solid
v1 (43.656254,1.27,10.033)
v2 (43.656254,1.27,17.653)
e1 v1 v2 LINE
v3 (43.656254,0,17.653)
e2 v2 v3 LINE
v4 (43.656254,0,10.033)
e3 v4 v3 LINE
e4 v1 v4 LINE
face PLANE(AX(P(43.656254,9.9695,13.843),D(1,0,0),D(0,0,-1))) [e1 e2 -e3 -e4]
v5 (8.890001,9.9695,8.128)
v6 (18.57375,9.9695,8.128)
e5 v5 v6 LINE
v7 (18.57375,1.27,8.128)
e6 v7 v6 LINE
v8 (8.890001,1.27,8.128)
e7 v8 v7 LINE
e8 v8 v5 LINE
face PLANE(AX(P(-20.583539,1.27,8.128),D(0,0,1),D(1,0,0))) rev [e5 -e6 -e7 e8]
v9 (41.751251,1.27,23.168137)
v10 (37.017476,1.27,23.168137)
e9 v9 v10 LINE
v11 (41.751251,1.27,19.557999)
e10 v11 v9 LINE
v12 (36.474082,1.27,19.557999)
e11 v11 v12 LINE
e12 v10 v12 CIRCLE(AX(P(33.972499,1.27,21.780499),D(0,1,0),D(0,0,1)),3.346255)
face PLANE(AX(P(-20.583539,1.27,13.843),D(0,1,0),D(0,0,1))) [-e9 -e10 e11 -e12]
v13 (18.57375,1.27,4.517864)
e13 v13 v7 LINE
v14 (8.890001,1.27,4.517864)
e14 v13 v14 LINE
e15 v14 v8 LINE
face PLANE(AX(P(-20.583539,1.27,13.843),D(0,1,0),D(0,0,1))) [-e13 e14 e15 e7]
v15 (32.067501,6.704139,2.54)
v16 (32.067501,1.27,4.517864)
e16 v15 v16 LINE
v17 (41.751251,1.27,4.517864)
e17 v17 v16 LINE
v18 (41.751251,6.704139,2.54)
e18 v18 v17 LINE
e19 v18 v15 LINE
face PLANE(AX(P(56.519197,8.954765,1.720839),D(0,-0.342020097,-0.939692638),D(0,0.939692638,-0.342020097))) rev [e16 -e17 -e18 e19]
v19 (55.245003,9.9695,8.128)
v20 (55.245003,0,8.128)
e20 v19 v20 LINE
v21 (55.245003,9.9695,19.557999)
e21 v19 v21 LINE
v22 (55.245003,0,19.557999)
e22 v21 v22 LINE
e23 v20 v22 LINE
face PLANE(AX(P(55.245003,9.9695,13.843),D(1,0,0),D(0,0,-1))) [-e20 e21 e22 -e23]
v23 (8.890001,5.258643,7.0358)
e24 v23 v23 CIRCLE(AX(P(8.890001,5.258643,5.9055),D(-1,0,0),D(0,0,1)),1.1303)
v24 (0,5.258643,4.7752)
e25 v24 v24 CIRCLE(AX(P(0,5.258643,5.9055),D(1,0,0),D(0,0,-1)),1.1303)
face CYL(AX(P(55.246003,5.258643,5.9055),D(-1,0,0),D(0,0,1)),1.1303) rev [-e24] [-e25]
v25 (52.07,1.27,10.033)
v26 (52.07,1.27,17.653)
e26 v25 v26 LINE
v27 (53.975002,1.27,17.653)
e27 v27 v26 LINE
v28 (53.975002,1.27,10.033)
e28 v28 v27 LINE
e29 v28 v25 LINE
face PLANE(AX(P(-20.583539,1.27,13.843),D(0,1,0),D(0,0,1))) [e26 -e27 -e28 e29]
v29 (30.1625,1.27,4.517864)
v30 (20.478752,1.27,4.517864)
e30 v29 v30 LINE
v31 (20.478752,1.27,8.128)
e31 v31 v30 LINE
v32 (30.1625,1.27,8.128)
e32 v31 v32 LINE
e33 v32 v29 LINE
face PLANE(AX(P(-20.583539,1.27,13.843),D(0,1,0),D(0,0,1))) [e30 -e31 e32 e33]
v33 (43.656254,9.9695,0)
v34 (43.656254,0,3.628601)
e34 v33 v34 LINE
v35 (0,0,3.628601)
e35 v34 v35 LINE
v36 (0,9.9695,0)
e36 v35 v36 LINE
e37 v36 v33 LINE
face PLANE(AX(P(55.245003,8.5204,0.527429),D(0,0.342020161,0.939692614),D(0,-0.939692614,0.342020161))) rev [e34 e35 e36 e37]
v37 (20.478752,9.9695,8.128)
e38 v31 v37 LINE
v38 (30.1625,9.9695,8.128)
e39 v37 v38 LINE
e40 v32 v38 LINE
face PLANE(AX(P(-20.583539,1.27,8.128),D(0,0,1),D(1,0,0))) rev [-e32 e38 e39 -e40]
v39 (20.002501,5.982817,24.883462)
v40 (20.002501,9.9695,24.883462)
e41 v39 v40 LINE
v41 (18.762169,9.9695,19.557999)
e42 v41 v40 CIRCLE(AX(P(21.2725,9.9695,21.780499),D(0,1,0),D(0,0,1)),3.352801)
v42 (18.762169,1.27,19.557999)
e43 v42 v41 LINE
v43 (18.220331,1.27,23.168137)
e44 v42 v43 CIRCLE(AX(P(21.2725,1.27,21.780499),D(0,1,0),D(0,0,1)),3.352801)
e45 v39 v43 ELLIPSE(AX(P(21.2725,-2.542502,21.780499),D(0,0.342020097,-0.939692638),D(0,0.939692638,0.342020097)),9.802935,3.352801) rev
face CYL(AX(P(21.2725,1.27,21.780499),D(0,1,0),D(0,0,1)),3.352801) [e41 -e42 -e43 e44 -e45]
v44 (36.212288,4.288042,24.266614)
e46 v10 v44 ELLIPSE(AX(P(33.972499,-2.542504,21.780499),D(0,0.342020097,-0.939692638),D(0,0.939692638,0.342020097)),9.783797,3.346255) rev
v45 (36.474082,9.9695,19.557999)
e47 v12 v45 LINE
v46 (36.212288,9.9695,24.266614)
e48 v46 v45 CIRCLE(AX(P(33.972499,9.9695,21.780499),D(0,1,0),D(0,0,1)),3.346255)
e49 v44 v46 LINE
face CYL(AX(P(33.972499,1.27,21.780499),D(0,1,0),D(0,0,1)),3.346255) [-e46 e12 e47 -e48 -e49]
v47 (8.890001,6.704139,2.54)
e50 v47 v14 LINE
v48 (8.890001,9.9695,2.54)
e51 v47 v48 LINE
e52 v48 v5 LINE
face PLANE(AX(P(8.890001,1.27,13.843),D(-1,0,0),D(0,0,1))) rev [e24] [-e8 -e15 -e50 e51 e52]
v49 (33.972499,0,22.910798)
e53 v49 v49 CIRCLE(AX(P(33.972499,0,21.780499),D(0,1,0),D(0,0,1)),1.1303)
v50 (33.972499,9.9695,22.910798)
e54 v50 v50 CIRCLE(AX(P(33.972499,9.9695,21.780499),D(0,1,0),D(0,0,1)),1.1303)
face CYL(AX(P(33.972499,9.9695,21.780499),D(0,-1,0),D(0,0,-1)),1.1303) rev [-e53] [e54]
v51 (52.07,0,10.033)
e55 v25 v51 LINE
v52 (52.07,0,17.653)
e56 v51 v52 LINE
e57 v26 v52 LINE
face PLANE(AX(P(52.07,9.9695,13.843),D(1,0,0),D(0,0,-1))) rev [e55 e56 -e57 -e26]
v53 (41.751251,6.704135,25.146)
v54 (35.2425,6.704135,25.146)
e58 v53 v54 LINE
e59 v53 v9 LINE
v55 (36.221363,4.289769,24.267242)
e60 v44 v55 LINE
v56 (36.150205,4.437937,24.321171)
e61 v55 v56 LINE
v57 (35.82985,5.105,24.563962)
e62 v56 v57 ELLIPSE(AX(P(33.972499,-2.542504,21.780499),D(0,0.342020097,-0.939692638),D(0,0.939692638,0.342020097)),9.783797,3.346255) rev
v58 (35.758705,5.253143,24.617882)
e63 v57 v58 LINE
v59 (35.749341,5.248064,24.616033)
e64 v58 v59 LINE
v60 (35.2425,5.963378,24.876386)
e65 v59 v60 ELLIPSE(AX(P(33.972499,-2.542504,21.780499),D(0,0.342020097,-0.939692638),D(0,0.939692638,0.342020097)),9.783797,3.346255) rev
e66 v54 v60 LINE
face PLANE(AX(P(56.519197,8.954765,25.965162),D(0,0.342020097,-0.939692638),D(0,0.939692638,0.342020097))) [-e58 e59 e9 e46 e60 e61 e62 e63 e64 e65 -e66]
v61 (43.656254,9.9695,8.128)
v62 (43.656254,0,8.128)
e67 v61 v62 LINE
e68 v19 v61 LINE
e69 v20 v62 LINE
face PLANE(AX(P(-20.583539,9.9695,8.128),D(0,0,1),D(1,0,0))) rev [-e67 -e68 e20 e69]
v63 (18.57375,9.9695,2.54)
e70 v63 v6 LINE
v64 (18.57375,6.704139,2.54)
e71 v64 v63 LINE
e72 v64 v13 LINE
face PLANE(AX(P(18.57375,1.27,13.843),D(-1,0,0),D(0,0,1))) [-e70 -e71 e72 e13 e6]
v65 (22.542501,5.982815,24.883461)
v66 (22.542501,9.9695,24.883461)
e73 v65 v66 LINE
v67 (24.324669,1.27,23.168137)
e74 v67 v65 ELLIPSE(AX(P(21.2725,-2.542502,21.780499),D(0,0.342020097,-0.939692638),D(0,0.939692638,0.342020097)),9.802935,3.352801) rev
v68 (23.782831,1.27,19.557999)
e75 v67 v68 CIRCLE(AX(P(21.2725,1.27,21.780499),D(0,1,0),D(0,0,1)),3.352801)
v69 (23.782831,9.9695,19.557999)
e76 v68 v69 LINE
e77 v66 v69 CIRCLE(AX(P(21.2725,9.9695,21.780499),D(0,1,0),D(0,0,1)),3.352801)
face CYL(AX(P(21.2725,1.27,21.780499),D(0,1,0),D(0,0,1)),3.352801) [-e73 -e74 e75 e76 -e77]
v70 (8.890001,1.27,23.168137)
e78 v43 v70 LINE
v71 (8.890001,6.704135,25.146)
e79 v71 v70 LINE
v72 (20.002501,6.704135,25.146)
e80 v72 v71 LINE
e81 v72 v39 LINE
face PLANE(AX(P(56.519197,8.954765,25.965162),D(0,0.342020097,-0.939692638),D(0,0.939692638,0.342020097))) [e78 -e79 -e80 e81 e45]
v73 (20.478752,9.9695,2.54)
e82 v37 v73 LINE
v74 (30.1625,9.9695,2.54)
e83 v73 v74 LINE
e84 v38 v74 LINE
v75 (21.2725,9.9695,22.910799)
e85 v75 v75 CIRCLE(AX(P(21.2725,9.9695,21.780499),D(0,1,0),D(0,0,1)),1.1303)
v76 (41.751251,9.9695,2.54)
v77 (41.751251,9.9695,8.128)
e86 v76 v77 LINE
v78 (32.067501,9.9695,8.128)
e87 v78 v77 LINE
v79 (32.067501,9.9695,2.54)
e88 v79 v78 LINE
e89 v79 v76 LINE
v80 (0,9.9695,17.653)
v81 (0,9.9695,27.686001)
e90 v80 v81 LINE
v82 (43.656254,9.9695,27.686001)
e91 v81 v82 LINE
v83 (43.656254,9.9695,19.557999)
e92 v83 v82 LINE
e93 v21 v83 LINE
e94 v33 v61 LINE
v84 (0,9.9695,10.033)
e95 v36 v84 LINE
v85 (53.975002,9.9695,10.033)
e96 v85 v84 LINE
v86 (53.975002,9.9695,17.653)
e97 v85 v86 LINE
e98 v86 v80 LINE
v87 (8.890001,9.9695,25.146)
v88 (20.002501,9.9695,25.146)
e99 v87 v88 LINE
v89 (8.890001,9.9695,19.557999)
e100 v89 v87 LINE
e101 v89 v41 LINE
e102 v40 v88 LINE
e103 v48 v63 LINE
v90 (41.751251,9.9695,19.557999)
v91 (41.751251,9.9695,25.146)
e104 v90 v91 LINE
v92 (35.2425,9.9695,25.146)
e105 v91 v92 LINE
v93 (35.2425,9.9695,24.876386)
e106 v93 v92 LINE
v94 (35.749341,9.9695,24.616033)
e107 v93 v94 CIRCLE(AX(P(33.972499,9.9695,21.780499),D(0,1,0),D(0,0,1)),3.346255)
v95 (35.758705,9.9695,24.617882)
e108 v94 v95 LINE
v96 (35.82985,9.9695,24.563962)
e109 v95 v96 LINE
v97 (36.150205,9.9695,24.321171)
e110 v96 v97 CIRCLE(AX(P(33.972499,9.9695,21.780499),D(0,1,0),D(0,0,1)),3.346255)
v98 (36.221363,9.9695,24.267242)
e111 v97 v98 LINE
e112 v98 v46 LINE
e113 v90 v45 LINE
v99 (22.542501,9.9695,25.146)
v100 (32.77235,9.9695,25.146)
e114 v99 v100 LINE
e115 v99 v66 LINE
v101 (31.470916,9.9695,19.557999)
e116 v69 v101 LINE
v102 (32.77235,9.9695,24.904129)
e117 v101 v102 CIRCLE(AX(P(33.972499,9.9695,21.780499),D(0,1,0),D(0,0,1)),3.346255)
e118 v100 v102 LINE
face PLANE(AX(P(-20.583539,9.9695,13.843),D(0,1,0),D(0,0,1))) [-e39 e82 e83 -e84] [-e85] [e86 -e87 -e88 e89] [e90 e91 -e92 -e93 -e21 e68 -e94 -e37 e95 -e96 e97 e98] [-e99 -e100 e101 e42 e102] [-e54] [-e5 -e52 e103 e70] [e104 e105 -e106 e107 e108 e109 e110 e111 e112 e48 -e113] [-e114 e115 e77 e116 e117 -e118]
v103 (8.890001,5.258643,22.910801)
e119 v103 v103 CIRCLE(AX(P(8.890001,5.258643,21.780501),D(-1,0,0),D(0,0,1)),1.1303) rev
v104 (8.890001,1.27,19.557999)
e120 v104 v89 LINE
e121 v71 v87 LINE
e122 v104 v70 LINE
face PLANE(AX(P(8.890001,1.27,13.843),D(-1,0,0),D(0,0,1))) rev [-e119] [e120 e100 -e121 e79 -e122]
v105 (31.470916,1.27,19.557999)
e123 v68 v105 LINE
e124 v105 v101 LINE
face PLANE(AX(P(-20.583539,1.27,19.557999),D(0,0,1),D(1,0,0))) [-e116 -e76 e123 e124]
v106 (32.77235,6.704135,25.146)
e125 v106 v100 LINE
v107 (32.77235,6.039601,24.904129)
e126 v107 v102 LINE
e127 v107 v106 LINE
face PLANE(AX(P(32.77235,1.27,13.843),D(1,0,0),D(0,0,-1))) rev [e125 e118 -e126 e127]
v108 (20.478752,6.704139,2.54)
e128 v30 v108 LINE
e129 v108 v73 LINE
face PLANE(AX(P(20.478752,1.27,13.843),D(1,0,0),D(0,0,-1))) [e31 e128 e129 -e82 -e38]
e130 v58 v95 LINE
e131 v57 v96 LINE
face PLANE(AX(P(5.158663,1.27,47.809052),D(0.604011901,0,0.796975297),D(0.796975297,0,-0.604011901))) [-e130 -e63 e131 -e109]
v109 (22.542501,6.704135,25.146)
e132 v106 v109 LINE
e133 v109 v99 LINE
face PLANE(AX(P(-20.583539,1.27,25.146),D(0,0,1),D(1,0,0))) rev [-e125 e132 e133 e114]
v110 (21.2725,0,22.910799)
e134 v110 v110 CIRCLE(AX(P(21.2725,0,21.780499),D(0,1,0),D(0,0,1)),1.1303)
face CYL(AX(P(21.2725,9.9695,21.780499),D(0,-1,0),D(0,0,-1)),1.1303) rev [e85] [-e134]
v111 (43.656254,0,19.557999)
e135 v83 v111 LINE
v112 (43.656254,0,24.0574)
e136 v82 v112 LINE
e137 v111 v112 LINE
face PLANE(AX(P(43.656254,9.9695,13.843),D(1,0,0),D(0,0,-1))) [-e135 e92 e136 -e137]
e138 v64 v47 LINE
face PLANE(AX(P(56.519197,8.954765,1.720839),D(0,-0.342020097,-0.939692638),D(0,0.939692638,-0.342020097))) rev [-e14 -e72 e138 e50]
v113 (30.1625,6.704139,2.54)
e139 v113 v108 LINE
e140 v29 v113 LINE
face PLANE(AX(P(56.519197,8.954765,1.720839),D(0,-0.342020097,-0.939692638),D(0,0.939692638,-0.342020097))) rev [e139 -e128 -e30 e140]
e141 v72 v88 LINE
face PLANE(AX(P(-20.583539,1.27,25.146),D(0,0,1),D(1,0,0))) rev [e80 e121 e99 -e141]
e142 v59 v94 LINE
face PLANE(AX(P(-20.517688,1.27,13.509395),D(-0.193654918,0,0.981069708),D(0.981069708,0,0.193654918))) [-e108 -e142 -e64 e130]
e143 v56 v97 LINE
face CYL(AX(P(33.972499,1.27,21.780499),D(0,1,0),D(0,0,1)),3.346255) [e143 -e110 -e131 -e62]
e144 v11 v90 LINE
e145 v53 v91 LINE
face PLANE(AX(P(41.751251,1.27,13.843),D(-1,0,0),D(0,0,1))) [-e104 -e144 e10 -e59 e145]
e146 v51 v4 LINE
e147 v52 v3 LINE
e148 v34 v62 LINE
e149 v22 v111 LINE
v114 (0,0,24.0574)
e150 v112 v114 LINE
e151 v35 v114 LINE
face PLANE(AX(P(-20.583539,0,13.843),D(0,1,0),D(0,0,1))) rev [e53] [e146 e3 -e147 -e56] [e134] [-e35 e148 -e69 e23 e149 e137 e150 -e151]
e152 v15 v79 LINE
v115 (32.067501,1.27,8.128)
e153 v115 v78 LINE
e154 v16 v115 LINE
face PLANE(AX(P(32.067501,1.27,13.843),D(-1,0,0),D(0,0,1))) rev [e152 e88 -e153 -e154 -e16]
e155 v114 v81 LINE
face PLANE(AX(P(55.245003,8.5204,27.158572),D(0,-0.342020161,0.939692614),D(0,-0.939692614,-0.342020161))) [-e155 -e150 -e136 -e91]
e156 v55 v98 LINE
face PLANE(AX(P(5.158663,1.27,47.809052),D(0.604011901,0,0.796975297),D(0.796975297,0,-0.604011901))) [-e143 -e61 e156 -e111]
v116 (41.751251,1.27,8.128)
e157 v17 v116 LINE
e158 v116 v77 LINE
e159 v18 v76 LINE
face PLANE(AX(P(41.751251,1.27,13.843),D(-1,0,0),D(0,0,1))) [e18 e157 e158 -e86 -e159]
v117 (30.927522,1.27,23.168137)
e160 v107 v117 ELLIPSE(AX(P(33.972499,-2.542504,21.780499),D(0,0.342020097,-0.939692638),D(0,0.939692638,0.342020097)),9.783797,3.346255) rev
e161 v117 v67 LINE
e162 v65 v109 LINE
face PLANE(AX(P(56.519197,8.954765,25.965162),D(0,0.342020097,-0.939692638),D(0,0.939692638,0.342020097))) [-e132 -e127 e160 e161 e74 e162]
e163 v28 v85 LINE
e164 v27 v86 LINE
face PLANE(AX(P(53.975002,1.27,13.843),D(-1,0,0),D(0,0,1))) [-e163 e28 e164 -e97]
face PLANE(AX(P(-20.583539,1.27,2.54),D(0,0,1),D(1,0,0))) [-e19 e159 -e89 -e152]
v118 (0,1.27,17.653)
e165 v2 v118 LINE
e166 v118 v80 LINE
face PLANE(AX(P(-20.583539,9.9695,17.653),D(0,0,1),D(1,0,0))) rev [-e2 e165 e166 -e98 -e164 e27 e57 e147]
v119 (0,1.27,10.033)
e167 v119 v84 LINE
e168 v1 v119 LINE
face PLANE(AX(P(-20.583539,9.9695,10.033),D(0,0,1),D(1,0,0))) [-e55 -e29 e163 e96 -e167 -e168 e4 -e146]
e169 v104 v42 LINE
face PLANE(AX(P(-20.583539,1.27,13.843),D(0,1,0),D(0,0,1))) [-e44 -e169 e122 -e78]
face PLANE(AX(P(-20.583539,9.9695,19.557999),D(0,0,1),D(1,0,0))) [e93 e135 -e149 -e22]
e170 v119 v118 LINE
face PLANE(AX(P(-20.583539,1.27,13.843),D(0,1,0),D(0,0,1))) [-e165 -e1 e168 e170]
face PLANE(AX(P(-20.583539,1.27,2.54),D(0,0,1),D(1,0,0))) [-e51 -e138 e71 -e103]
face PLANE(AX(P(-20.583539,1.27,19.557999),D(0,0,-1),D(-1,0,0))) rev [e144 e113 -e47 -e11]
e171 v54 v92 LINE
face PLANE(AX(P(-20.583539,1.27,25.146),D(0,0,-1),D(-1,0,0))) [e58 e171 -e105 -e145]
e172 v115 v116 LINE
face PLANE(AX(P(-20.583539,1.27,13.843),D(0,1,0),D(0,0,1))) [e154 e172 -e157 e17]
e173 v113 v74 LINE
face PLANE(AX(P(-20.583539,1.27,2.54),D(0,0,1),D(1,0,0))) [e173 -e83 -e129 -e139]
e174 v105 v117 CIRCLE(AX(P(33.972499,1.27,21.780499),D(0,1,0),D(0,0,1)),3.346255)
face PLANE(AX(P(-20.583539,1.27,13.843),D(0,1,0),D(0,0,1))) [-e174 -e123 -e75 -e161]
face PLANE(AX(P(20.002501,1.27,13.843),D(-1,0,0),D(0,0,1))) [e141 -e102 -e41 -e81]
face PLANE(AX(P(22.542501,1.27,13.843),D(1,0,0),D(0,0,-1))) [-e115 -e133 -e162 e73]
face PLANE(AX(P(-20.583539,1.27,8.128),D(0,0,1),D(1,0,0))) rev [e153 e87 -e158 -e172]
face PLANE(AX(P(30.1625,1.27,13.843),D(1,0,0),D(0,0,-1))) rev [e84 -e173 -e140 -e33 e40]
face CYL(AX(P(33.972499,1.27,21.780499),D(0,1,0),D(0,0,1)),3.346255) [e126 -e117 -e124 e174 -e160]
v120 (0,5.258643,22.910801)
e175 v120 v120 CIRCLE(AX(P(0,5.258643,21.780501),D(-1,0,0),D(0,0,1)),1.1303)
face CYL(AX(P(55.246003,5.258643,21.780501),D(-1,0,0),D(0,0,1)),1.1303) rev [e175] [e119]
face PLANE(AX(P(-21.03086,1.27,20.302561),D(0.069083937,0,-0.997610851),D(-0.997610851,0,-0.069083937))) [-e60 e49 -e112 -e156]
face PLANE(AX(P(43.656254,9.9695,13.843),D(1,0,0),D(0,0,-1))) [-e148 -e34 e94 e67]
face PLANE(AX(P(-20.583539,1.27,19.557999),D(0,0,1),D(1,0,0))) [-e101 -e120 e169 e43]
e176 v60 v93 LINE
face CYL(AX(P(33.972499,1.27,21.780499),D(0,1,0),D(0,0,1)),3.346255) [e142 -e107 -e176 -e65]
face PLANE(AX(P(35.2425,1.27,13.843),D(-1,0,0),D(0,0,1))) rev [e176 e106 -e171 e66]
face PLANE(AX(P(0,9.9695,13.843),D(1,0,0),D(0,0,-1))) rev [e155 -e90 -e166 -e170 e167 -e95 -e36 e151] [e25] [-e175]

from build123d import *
from OCP.BRepAlgoAPI import BRepAlgoAPI_Cut
from OCP.TopTools import TopTools_ListOfShape

# Parameters (mm, degrees)
SKETCH_283_W           = 8.41374588
SKETCH_283_H           = 7.619999886
EXTRUDE_5712_DEPTH     = 9.9695
SKETCH_4_W             = 9.683748245
SKETCH_4_H             = 5.588000536
SKETCH_4_W_2           = 9.683750153
SKETCH_4_W_3           = 1.905002594
SKETCH_4_H_2           = 7.619999886
SKETCH_4_W_4           = 43.656253815
CUT_EXTRUDE_5770_DEPTH = 8.6995
CUT_EXTRUDE_9_DEPTH    = 63.593257627
EXTRUDE_10_REACH       = 64.593
CUT_EXTRUDE_11_REACH   = 64.593
SKETCH_7_R             = 1.130300066
SKETCH_5_R             = 1.13029956
SKETCH_5_R_2           = 1.130299504
CUT_EXTRUDE_12_DEPTH   = 63.593257627


with BuildPart() as part:
    # Sketch 283 → Extrude 5712 (new body)
    with BuildSketch(Plane(origin=(0, 0, 0), x_dir=(1, 0, 0), z_dir=(0, 1, 0))):
        Polygon((43.656253815, 0), (0, 0), (0, -27.686000824), (43.656253815, -27.686000824), (43.656253815, -19.557998657), (55.245002747, -19.557998657), (55.245002747, -8.128000259), (43.656253815, -8.128000259), align=None)
        with Locations((47.863126755, -13.842999935)):
            Rectangle(SKETCH_283_W, SKETCH_283_H, mode=Mode.SUBTRACT)
    extrude(amount=EXTRUDE_5712_DEPTH)


with BuildPart() as cut_extrude_5770_tool:
    # 草图4 → Cut-Extrude 5770 (new body)
    with BuildSketch(Plane(origin=(0, 9.969499588, 0), x_dir=(1, 0, 0), z_dir=(0, 1, 0))):
        with Locations((13.73187542, -5.333999991)):
            Rectangle(SKETCH_4_W, SKETCH_4_H)
        with Locations((25.320626258, -5.333999991)):
            Rectangle(SKETCH_4_W, SKETCH_4_H)
        with Locations((36.909376145, -5.333999991)):
            Rectangle(SKETCH_4_W_2, SKETCH_4_H)
        with Locations((53.022500992, -13.842999935)):
            Rectangle(SKETCH_4_W_3, SKETCH_4_H_2)
        with Locations((21.828126907, -13.842999935)):
            Rectangle(SKETCH_4_W_4, SKETCH_4_H_2)
        with BuildLine():
            ThreePointArc((18.220330198, -23.168134689), (17.956836473, -21.282857597), (18.762168884, -19.557998657))
            Line((18.762168884, -19.557998657), (8.890001297, -19.557998657))
            Line((8.890001297, -19.557998657), (8.890001297, -23.168134689))
            Line((8.890001297, -23.168134689), (18.220330198, -23.168134689))
        make_face()
        with BuildLine():
            ThreePointArc((20.002500534, -24.883461506), (18.947446601, -24.196156461), (18.220330198, -23.168134689))
            Line((18.220330198, -23.168134689), (8.890001297, -23.168134689))
            Line((8.890001297, -23.168134689), (8.890001297, -25.145999908))
            Line((8.890001297, -25.145999908), (20.002500534, -25.145999908))
            Line((20.002500534, -25.145999908), (20.002500534, -24.883461506))
        make_face()
        with BuildLine():
            ThreePointArc((30.927521198, -23.168134689), (30.663518149, -21.282433428), (31.470916179, -19.557998657))
            Line((31.470916179, -19.557998657), (23.782831176, -19.557998657))
            ThreePointArc((23.782831176, -19.557998657), (24.407616627, -20.592090361), (24.625300686, -21.78049945))
            ThreePointArc((24.625300686, -21.78049945), (24.549281168, -22.490413257), (24.324669862, -23.168134689))
            Line((24.324669862, -23.168134689), (30.927521198, -23.168134689))
        make_face()
        with BuildLine():
            ThreePointArc((32.772350311, -24.904129054), (31.679314783, -24.217449589), (30.927521198, -23.168134689))
            Line((30.927521198, -23.168134689), (24.324669862, -23.168134689))
            ThreePointArc((24.324669862, -23.168134689), (23.597554208, -24.19615574), (22.54250145, -24.883460719))
            Line((22.54250145, -24.883460719), (22.54250145, -25.145999908))
            Line((22.54250145, -25.145999908), (32.772350311, -25.145999908))
            Line((32.772350311, -25.145999908), (32.772350311, -24.904129054))
        make_face()
        with BuildLine():
            Line((41.751251221, -25.145999908), (41.751251221, -23.168134689))
            Line((41.751251221, -23.168134689), (37.017476717, -23.168134689))
            ThreePointArc((37.017476717, -23.168134689), (36.671360521, -23.758773077), (36.212287817, -24.266613976))
            Line((36.212287817, -24.266613976), (36.221363068, -24.267242432))
            Line((36.221363068, -24.267242432), (36.150205492, -24.321171358))
            ThreePointArc((36.150205492, -24.321171358), (35.993676848, -24.447381385), (35.8298504, -24.563962181))
            Line((35.8298504, -24.563962181), (35.758705139, -24.617881775))
            Line((35.758705139, -24.617881775), (35.749340746, -24.616033322))
            ThreePointArc((35.749340746, -24.616033322), (35.501472205, -24.757017499), (35.242500305, -24.876386285))
            Line((35.242500305, -24.876386285), (35.242500305, -25.145999908))
            Line((35.242500305, -25.145999908), (41.751251221, -25.145999908))
        make_face()
        with BuildLine():
            Line((41.751251221, -23.168134689), (41.751251221, -19.557998657))
            Line((41.751251221, -19.557998657), (36.474081737, -19.557998657))
            ThreePointArc((36.474081737, -19.557998657), (37.10046612, -20.591699149), (37.318754037, -21.780498749))
            ThreePointArc((37.318754037, -21.780498749), (37.242567409, -22.490481412), (37.017476717, -23.168134689))
            Line((37.017476717, -23.168134689), (41.751251221, -23.168134689))
        make_face()
    extrude(amount=-CUT_EXTRUDE_5770_DEPTH)


with BuildPart() as part_1:
    add(part.part)

    # Cut-Extrude 5770: cut by cut_extrude_5770_tool, with a tolerance
    cut_extrude_5770_stock = TopTools_ListOfShape()
    cut_extrude_5770_stock.Append(part_1.part.wrapped)
    cut_extrude_5770_tools = TopTools_ListOfShape()
    cut_extrude_5770_tools.Append(cut_extrude_5770_tool.part.wrapped)
    cut_extrude_5770_cut = BRepAlgoAPI_Cut()
    cut_extrude_5770_cut.SetArguments(cut_extrude_5770_stock)
    cut_extrude_5770_cut.SetTools(cut_extrude_5770_tools)
    cut_extrude_5770_cut.SetFuzzyValue(0.00001)
    cut_extrude_5770_cut.Build()
    add(Compound.cast(cut_extrude_5770_cut.Shape()).solids(), mode=Mode.REPLACE)

    # Sketch 3431 → 拉伸9 (cut, through all)
    with BuildSketch(Plane(origin=(0, 0, 0), x_dir=(0, 0, -1), z_dir=(1, 0, 0))):
        Polygon((0, 0), (-3.628601313, 0), (0, 9.969499588), align=None)
    cut_extrude_9 = extrude(amount=CUT_EXTRUDE_9_DEPTH, mode=Mode.SUBTRACT)

    # 拉伸10: up to this face of the body (flat: up to its plane)
    extrude_10_end = Plane(part_1.part.faces().sort_by_distance((43.656253815, 5.462221292, 4.884257746))[0])
    # 右视标记<6> → 拉伸10 (add, up to the picked face)
    with BuildSketch(Plane(origin=(0, 0, 0), x_dir=(0, 0, -1), z_dir=(1, 0, 0)), mode=Mode.PRIVATE) as extrude_10_sk1:
        Polygon((-8.128000259, 1.269999862), (-8.128000259, 0), (-3.628601313, 0), (0, 9.969499588), (-2.539999723, 9.969499588), (-2.539999723, 6.704138756), (-4.517864227, 1.269999862), align=None)
    extrude_10_tool1 = split(extrude(extrude_10_sk1.sketch, amount=EXTRUDE_10_REACH, mode=Mode.PRIVATE), bisect_by=extrude_10_end, keep=Keep.BOTH, mode=Mode.PRIVATE)
    extrude_10 = extrude_10_tool1.solids().sort_by(Axis((0, 4.424317, 3.31525), (1, 0, 0)))[0]
    add(extrude_10)

    # 右视标记<7> → 拉伸11 (cut, up to next)
    with BuildSketch(Plane(origin=(0, 0, 0), x_dir=(0, 0, -1), z_dir=(1, 0, 0)), mode=Mode.PRIVATE) as cut_extrude_11_sk1:
        with Locations(Location((-5.905499899, 5.258642622, 0), (0, 0, 180))):
            Circle(SKETCH_7_R)
    cut_extrude_11_tool1 = extrude(cut_extrude_11_sk1.sketch, amount=CUT_EXTRUDE_11_REACH, mode=Mode.PRIVATE) & part_1.part
    cut_extrude_11 = cut_extrude_11_tool1.solids().sort_by_distance((0, 5.258643, 5.9055))[0]
    add(cut_extrude_11, mode=Mode.SUBTRACT)

    # 镜向2: 拉伸9, 拉伸10, 拉伸11 across plane
    add(cut_extrude_9.mirror(Plane.XY.offset(13.843000412)), mode=Mode.SUBTRACT)
    add(extrude_10.mirror(Plane.XY.offset(13.843000412)))
    add(cut_extrude_11.mirror(Plane.XY.offset(13.843000412)), mode=Mode.SUBTRACT)

    # 上视标记<5> → 拉伸12 (cut, through all)
    with BuildSketch(Plane(origin=(0, 0, 0), x_dir=(1, 0, 0), z_dir=(0, 1, 0))):
        with Locations(Location((21.27250003, -21.78049945, 0), (0, 0, 270))):
            Circle(SKETCH_5_R)
        with Locations(Location((33.972498958, -21.780498749, 0), (0, 0, 270))):
            Circle(SKETCH_5_R_2)
    extrude(amount=CUT_EXTRUDE_12_DEPTH, mode=Mode.SUBTRACT)


solid = part_1.part
